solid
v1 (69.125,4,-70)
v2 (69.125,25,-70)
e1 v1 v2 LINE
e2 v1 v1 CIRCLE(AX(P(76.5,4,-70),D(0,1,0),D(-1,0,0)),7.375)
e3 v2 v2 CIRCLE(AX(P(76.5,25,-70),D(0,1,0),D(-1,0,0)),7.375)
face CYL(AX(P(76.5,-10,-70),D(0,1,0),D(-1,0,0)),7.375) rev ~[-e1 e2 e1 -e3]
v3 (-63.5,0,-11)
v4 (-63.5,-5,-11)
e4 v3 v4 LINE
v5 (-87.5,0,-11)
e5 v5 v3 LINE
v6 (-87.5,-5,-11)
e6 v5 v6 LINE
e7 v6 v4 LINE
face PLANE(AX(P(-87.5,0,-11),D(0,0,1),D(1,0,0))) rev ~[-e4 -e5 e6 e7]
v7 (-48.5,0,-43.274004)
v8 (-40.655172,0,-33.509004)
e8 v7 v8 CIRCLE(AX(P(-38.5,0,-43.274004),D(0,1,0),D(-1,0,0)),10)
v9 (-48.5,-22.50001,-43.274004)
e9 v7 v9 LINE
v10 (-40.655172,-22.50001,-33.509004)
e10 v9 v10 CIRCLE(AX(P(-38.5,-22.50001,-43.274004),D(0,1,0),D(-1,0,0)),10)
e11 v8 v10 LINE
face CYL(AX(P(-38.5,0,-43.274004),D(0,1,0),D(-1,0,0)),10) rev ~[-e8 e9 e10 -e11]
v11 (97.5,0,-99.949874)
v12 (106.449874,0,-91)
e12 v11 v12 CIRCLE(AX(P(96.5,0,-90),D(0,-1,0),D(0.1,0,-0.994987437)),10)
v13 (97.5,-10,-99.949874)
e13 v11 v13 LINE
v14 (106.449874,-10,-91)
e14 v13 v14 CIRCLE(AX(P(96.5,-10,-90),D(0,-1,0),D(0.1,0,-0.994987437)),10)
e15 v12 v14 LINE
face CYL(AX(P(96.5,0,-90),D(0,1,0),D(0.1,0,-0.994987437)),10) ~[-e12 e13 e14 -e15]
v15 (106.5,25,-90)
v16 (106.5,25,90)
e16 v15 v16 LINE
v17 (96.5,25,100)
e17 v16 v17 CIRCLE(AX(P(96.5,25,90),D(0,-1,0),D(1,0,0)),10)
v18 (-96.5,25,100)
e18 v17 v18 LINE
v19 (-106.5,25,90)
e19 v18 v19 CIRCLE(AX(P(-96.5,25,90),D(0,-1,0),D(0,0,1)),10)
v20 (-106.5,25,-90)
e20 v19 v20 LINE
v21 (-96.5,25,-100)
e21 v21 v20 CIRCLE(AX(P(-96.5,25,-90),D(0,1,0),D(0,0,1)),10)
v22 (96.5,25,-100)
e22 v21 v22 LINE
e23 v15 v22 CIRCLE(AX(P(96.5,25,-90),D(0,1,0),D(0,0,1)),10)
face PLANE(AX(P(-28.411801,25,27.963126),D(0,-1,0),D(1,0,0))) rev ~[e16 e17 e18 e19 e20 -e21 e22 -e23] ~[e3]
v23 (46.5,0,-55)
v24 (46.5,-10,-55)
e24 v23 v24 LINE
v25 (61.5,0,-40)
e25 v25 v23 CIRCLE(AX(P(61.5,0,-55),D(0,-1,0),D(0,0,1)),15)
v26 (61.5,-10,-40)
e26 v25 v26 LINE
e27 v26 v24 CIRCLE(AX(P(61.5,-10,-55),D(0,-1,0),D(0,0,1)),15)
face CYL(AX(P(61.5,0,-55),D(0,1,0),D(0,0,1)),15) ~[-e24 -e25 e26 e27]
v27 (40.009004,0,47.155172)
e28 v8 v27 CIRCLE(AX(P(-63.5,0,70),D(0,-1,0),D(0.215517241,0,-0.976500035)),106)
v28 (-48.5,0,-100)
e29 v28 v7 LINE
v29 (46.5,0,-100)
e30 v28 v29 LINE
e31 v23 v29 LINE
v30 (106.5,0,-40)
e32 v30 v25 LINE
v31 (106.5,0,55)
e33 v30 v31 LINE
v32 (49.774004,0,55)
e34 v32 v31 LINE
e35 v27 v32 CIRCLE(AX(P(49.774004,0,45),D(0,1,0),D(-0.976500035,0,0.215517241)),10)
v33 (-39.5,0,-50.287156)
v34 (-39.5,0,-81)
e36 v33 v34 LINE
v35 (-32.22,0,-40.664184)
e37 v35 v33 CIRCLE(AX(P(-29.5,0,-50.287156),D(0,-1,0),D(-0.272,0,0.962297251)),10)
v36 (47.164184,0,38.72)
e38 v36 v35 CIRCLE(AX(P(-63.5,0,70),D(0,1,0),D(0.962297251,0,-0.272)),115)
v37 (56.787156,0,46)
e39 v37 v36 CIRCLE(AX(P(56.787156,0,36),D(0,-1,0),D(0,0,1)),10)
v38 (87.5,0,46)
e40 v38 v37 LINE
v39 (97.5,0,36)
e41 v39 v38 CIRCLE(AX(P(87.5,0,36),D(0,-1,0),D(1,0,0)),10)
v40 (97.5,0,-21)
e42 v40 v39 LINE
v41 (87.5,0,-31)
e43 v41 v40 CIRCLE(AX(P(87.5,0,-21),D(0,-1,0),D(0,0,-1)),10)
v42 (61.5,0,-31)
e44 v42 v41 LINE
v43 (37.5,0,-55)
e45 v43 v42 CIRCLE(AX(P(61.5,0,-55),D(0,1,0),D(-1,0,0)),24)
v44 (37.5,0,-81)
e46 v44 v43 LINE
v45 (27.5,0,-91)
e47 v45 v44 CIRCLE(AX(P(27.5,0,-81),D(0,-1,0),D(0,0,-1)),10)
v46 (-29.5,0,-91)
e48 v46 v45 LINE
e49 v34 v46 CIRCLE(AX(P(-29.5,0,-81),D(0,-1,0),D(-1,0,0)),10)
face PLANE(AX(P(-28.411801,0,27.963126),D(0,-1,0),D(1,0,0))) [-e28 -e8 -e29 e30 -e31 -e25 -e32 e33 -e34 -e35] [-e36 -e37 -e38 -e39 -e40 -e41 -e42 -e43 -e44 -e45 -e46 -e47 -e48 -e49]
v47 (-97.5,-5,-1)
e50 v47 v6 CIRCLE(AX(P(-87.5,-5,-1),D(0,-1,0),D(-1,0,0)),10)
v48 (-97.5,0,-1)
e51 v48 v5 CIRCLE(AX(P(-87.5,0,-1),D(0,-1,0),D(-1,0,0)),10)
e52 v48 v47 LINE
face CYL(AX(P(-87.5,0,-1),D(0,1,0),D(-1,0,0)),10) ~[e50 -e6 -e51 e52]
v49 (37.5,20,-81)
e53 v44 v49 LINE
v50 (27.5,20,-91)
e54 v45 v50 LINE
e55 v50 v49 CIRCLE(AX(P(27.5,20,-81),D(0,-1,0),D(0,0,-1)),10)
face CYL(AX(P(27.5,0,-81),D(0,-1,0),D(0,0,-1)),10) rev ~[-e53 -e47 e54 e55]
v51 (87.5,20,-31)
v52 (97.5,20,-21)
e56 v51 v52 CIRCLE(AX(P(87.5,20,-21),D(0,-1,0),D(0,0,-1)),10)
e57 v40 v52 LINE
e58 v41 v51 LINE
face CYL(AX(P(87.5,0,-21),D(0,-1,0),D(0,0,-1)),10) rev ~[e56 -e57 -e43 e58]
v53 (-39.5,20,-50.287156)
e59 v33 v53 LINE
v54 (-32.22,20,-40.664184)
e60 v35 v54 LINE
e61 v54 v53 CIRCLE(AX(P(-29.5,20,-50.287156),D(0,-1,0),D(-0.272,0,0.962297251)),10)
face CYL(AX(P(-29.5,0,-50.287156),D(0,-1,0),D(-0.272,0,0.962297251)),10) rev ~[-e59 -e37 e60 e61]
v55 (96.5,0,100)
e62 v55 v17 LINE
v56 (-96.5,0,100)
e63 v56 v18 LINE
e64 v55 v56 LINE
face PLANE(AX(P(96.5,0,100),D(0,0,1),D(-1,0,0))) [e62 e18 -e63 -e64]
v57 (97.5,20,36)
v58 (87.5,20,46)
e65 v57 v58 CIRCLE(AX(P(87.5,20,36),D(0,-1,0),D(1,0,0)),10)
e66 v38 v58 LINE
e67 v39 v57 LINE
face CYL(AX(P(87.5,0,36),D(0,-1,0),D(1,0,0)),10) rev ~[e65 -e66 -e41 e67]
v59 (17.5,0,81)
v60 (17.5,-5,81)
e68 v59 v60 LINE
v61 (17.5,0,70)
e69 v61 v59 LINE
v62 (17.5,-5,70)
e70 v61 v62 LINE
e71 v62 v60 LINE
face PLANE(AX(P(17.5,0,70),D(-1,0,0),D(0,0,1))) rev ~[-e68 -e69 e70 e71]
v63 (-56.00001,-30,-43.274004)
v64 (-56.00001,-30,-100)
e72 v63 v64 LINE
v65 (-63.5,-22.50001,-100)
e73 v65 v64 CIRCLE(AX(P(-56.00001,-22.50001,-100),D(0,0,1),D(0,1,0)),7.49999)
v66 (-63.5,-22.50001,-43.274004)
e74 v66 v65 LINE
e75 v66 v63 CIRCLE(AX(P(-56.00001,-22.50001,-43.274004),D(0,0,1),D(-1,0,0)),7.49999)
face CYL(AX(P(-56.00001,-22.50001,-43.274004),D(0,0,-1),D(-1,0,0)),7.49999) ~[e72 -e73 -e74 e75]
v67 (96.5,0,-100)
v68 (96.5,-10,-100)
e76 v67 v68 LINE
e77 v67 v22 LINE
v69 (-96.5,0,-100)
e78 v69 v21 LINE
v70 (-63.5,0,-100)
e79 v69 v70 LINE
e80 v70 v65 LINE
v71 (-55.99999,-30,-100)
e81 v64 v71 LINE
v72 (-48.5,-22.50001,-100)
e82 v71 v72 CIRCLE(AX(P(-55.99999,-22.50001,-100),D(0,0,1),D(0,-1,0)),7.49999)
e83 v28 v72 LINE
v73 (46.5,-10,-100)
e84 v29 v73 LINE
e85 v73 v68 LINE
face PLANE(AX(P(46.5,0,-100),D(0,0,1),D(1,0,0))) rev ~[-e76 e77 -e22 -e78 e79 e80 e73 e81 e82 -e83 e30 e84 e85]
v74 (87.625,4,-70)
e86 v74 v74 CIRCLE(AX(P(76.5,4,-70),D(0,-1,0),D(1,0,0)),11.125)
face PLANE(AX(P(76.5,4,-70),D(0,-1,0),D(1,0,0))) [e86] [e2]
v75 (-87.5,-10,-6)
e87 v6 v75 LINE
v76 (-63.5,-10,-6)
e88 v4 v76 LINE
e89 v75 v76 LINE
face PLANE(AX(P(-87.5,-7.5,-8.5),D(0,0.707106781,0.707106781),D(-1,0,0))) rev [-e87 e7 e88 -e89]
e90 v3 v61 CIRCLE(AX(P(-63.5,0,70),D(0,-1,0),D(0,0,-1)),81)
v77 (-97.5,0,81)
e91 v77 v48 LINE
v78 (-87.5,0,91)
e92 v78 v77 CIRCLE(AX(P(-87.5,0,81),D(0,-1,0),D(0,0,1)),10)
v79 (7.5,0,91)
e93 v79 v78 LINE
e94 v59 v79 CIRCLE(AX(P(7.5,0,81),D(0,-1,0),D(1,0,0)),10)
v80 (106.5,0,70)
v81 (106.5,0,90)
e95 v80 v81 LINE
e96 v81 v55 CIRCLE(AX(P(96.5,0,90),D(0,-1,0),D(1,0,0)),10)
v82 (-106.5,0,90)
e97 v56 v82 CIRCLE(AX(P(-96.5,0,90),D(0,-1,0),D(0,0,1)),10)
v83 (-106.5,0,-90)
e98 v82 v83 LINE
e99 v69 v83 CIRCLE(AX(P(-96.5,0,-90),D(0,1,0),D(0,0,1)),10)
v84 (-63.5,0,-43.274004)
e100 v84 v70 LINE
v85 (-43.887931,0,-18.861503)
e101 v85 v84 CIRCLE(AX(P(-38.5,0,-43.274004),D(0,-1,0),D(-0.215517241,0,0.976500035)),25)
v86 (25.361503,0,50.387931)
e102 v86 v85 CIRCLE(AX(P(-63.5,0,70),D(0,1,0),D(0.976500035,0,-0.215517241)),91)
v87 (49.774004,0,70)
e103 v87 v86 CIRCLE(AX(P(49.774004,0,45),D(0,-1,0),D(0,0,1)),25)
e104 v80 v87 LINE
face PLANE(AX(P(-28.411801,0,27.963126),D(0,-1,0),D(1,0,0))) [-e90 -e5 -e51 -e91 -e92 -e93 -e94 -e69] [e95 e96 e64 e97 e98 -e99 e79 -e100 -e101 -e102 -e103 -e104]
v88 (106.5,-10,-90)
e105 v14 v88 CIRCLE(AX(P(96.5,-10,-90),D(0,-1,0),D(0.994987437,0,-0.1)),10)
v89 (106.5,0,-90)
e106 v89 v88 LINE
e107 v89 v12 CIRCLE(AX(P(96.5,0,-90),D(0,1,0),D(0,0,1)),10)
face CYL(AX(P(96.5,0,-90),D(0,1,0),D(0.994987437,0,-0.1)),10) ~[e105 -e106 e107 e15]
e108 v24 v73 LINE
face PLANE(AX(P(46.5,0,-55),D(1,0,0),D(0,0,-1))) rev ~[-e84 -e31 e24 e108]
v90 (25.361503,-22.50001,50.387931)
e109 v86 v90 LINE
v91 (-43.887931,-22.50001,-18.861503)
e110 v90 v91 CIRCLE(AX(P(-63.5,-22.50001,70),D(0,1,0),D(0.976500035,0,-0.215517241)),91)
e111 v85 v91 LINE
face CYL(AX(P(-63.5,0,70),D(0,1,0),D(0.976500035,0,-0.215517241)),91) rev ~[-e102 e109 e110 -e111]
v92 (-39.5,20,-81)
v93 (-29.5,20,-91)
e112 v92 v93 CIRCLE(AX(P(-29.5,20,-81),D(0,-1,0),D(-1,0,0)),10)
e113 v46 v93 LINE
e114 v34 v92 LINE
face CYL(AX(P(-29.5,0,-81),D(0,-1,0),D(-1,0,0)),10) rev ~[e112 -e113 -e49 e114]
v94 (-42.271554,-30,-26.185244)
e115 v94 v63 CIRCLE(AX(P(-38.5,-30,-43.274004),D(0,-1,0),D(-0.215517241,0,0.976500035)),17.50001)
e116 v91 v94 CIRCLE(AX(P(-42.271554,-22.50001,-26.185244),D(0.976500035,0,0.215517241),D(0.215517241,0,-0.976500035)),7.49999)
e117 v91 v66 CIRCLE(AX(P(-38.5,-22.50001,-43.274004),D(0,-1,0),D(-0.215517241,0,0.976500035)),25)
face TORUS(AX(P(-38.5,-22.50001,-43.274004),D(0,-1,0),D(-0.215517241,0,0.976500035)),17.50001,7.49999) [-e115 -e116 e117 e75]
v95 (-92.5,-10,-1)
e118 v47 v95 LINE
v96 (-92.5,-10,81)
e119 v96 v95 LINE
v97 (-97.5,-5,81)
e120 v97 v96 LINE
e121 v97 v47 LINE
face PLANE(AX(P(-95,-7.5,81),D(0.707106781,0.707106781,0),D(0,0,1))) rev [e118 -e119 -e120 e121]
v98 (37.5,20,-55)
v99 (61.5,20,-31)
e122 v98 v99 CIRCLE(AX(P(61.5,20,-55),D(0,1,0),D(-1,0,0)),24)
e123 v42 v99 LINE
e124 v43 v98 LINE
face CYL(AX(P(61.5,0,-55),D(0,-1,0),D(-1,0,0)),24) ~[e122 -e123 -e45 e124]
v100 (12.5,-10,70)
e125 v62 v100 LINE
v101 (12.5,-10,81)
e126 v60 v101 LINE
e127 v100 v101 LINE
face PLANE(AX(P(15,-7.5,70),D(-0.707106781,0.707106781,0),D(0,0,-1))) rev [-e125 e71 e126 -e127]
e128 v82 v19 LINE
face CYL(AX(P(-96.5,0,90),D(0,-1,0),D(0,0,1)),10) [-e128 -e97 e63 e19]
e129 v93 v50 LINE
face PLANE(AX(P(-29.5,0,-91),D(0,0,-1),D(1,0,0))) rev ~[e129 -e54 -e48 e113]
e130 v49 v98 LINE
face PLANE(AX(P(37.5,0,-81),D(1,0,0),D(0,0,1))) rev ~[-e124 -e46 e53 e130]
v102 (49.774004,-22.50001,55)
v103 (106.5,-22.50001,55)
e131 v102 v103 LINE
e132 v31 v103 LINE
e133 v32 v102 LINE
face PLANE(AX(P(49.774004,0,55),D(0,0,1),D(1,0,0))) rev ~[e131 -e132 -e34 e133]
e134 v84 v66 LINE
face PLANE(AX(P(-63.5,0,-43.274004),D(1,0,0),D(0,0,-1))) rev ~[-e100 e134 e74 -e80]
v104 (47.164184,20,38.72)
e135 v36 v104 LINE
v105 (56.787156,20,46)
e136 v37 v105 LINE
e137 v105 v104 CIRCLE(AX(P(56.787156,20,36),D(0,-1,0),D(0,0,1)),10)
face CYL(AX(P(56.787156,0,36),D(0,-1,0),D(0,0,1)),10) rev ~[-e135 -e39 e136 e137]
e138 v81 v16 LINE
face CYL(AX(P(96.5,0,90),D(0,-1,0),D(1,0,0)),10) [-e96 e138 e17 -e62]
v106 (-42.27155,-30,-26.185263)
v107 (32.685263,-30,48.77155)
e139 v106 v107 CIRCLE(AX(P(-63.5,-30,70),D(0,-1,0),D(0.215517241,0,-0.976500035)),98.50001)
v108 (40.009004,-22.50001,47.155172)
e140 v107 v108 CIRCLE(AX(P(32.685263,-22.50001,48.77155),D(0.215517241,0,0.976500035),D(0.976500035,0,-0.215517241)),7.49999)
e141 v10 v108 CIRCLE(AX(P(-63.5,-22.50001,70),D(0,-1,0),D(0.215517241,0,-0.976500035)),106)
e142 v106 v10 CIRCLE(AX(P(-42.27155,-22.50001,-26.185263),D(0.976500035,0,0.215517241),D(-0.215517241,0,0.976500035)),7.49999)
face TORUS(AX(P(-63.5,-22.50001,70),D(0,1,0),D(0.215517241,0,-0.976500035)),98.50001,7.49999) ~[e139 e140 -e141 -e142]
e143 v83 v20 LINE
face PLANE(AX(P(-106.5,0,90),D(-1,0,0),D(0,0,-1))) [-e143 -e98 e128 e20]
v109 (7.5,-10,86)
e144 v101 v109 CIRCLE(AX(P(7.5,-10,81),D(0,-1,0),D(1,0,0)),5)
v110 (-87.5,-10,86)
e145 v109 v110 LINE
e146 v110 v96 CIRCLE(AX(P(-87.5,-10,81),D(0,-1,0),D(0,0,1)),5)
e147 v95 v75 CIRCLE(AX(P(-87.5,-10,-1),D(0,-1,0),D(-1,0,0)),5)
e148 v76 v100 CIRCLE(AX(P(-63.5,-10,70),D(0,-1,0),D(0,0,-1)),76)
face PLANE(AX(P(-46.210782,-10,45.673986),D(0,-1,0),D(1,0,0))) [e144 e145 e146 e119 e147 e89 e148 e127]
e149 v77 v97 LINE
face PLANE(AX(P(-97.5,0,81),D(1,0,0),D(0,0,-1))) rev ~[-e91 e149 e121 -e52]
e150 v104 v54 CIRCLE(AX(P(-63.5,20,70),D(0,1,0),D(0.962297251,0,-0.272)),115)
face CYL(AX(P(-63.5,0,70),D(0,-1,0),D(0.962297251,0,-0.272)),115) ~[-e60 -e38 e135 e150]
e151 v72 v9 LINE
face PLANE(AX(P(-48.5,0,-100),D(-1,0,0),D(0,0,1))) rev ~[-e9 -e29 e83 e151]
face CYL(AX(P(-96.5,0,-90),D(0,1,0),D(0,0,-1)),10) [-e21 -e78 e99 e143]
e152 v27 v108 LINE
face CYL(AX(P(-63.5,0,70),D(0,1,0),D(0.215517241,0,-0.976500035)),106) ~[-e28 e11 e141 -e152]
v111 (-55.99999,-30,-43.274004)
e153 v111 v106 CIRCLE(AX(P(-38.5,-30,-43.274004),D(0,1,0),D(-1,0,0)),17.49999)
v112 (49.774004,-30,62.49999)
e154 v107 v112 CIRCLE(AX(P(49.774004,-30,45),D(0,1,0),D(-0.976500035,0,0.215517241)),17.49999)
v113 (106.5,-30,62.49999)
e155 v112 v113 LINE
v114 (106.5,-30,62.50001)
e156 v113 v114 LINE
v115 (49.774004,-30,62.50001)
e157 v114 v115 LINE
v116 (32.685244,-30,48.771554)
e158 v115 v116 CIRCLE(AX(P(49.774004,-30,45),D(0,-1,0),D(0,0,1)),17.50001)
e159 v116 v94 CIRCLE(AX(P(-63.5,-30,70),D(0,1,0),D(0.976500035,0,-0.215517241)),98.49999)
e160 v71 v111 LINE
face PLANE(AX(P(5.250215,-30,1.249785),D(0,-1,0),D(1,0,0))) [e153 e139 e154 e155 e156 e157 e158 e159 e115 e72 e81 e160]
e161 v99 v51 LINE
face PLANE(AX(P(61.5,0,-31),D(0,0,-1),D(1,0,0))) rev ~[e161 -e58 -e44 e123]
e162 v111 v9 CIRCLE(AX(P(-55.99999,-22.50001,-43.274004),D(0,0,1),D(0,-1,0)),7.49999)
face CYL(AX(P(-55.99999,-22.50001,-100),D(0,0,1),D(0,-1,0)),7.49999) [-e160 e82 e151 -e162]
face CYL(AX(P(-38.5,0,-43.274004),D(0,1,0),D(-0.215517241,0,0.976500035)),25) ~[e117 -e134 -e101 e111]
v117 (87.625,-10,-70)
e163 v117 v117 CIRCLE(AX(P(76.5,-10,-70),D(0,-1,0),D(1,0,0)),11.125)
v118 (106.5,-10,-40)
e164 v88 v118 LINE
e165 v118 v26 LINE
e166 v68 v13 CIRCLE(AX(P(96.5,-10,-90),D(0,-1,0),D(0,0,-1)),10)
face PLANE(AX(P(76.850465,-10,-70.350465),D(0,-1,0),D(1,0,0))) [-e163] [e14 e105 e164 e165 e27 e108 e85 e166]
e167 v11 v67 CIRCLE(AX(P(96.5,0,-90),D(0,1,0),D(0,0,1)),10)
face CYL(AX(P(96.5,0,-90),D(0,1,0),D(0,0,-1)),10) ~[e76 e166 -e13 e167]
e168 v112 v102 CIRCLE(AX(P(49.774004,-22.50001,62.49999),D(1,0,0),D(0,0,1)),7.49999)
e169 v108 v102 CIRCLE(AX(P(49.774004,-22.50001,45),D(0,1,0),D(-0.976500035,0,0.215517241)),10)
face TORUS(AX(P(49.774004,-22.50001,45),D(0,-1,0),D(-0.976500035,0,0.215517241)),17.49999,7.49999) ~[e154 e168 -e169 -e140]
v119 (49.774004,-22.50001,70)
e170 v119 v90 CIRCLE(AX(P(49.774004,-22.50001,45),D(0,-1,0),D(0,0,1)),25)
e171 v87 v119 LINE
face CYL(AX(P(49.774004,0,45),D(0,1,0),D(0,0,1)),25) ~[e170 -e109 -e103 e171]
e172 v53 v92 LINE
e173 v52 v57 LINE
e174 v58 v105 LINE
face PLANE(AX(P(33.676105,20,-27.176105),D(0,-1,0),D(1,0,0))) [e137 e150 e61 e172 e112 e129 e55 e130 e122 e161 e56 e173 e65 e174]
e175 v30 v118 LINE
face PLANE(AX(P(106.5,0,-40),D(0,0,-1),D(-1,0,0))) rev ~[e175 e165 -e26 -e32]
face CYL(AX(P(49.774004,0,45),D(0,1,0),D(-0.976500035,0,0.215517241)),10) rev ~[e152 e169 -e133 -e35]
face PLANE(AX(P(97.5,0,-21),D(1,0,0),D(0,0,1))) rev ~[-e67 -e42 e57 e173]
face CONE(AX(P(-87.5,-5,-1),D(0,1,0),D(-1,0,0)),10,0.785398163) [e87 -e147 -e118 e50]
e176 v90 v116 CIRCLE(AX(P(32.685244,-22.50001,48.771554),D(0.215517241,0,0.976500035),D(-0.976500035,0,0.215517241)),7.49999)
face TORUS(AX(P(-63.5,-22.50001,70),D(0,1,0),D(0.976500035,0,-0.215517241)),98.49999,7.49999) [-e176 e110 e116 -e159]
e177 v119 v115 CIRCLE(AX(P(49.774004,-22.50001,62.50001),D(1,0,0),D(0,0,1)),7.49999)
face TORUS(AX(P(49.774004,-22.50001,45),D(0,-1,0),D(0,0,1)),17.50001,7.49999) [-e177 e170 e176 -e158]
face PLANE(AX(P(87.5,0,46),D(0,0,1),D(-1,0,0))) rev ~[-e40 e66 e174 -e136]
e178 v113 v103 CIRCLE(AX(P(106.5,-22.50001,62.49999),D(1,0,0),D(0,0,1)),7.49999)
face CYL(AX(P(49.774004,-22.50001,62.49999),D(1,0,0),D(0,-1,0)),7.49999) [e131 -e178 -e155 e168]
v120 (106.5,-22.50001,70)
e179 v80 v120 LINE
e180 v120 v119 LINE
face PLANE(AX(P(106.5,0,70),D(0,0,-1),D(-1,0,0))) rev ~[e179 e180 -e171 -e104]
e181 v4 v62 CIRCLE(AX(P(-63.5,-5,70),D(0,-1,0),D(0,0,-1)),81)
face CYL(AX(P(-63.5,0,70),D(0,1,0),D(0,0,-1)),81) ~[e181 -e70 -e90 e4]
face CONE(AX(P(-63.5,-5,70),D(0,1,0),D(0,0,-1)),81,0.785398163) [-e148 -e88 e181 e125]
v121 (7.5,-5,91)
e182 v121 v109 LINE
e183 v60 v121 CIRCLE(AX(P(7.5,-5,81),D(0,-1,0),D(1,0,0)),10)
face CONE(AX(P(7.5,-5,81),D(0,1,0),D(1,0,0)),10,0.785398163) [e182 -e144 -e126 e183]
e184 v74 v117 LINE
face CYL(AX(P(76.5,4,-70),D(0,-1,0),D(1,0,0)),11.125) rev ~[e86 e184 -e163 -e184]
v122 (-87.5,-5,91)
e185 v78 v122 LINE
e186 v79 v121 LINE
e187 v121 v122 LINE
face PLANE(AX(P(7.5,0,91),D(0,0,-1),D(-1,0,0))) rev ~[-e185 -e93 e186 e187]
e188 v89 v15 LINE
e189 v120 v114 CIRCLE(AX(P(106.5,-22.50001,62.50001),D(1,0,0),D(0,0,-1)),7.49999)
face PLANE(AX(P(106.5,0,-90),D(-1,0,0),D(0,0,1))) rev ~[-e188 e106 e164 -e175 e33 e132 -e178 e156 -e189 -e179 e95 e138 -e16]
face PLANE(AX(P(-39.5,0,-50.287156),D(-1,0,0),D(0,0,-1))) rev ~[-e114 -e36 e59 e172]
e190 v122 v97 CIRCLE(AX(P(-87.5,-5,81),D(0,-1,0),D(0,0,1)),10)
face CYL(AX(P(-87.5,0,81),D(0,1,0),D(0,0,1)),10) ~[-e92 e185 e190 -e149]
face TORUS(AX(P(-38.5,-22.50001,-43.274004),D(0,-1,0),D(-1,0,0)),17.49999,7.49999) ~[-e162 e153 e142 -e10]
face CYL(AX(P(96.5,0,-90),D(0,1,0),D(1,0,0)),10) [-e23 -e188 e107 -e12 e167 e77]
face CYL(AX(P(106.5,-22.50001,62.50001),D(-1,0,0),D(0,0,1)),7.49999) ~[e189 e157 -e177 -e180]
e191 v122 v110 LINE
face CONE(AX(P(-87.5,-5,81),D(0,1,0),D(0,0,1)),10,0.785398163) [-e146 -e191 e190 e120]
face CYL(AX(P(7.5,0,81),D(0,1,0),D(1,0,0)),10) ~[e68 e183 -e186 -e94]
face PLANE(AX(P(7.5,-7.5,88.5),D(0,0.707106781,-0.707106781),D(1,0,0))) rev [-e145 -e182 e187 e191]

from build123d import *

# Parameters (mm, degrees)
F1_DEPTH        = 25
F2_DEPTH        = 10
F3_DEPTH        = 20
F4_DEPTH        = 30
F5_R            = 7.49999
F6_SIZE         = 5
F7_R            = 10
F8_DEPTH        = 10
F10_D           = 14.75
F10_CBORE_D     = 22.25
F10_CBORE_DEPTH = 14


# Not quite as in the source:
# - a fillet or chamfer is up to 0.001 mm smaller than in the source, because OpenCascade refuses the exact size


with BuildPart() as f1:
    # F0 (on Front) → F1 (new body)
    with BuildSketch(Plane.XZ):
        with BuildLine():
            Line((96.5, 100), (-96.5, 100))
            ThreePointArc((-96.5, 100), (-103.5710678119, 97.0710678119), (-106.5, 90))
            Line((-106.5, 90), (-106.5, -90))
            ThreePointArc((-106.5, -90), (-103.5710678119, -97.0710678119), (-96.5, -100))
            Line((-96.5, -100), (-63.5, -100))
            Line((-63.5, -100), (-63.5, -43.2740040786))
            ThreePointArc((-63.5, -43.2740040786), (-57.9897187751, -27.6167098657), (-43.8879310345, -18.8615031996))
            ThreePointArc((-43.8879310345, -18.8615031996), (0.846717088, 5.653282912), (25.3615031996, 50.3879310345))
            ThreePointArc((25.3615031996, 50.3879310345), (34.1167098657, 64.4897187751), (49.7740040786, 70))
            Line((49.7740040786, 70), (106.5, 70))
            Line((106.5, 70), (106.5, 90))
            ThreePointArc((106.5, 90), (103.5710678119, 97.0710678119), (96.5, 100))
        make_face()
        with BuildLine():
            ThreePointArc((17.5, 70), (-6.2243507239, 12.7243507239), (-63.5, -11))
            Line((-63.5, -11), (-87.5, -11))
            ThreePointArc((-87.5, -11), (-94.5710678119, -8.0710678119), (-97.5, -1))
            Line((-97.5, -1), (-97.5, 81))
            ThreePointArc((-97.5, 81), (-94.5710678119, 88.0710678119), (-87.5, 91))
            Line((-87.5, 91), (7.5, 91))
            ThreePointArc((7.5, 91), (14.5710678119, 88.0710678119), (17.5, 81))
            Line((17.5, 81), (17.5, 70))
        make_face(mode=Mode.SUBTRACT)
        with BuildLine():
            ThreePointArc((-96.5, -100), (-103.5710678119, -97.0710678119), (-106.5, -90))
            Line((-106.5, -90), (-106.5, -100))
            Line((-106.5, -100), (-96.5, -100))
        make_face()
        with BuildLine():
            Line((106.5, 55), (106.5, 70))
            Line((106.5, 70), (49.7740040786, 70))
            ThreePointArc((49.7740040786, 70), (34.1167098657, 64.4897187751), (25.3615031996, 50.3879310345))
            ThreePointArc((25.3615031996, 50.3879310345), (0.846717088, 5.653282912), (-43.8879310345, -18.8615031996))
            ThreePointArc((-43.8879310345, -18.8615031996), (-57.9897187751, -27.6167098657), (-63.5, -43.2740040786))
            Line((-63.5, -43.2740040786), (-63.5, -100))
            Line((-63.5, -100), (-48.5, -100))
            Line((-48.5, -100), (-48.5, -43.2740040786))
            ThreePointArc((-48.5, -43.2740040786), (-46.29588751, -37.0110863935), (-40.6551724138, -33.509003727))
            ThreePointArc((-40.6551724138, -33.509003727), (11.4533188058, -4.9533188058), (40.009003727, 47.1551724138))
            ThreePointArc((40.009003727, 47.1551724138), (43.5110863935, 52.79588751), (49.7740040786, 55))
            Line((49.7740040786, 55), (106.5, 55))
        make_face()
        with BuildLine():
            Line((106.5, -40), (106.5, 55))
            Line((106.5, 55), (49.7740040786, 55))
            ThreePointArc((49.7740040786, 55), (43.5110863935, 52.79588751), (40.009003727, 47.1551724138))
            ThreePointArc((40.009003727, 47.1551724138), (11.4533188058, -4.9533188058), (-40.6551724138, -33.509003727))
            ThreePointArc((-40.6551724138, -33.509003727), (-46.29588751, -37.0110863935), (-48.5, -43.2740040786))
            Line((-48.5, -43.2740040786), (-48.5, -100))
            Line((-48.5, -100), (46.5, -100))
            Line((46.5, -100), (46.5, -55))
            ThreePointArc((46.5, -55), (50.8933982822, -44.3933982822), (61.5, -40))
            Line((61.5, -40), (106.5, -40))
        make_face()
        with BuildLine():
            Line((56.7871564216, 46), (87.5, 46))
            ThreePointArc((87.5, 46), (94.5710678119, 43.0710678119), (97.5, 36))
            Line((97.5, 36), (97.5, -21))
            ThreePointArc((97.5, -21), (94.5710678119, -28.0710678119), (87.5, -31))
            Line((87.5, -31), (61.5, -31))
            ThreePointArc((61.5, -31), (44.5294372515, -38.0294372515), (37.5, -55))
            Line((37.5, -55), (37.5, -81))
            ThreePointArc((37.5, -81), (34.5710678119, -88.0710678119), (27.5, -91))
            Line((27.5, -91), (-29.5, -91))
            ThreePointArc((-29.5, -91), (-36.5710678119, -88.0710678119), (-39.5, -81))
            Line((-39.5, -81), (-39.5, -50.2871564216))
            ThreePointArc((-39.5, -50.2871564216), (-37.474960815, -44.25391517), (-32.22, -40.6641839079))
            ThreePointArc((-32.22, -40.6641839079), (17.8172798365, -11.3172798365), (47.1641839079, 38.72))
            ThreePointArc((47.1641839079, 38.72), (50.75391517, 43.974960815), (56.7871564216, 46))
        make_face(mode=Mode.SUBTRACT)
        with BuildLine():
            Line((106.5, -90), (106.5, -40))
            Line((106.5, -40), (61.5, -40))
            ThreePointArc((61.5, -40), (50.8933982822, -44.3933982822), (46.5, -55))
            Line((46.5, -55), (46.5, -100))
            Line((46.5, -100), (96.5, -100))
            ThreePointArc((96.5, -100), (97.0006277506, -99.9874607311), (97.5, -99.9498743711))
            ThreePointArc((97.5, -99.9498743711), (103.5710678119, -97.0710678119), (106.4498743711, -91))
            ThreePointArc((106.4498743711, -91), (106.4874607311, -90.5006277506), (106.5, -90))
        make_face()
        with BuildLine():
            Line((106.5, -91), (106.5, -90))
            ThreePointArc((106.5, -90), (106.4874607311, -90.5006277506), (106.4498743711, -91))
            Line((106.4498743711, -91), (106.5, -91))
        make_face()
        with BuildLine():
            Line((106.5, -91), (106.4498743711, -91))
            ThreePointArc((106.4498743711, -91), (103.5710678119, -97.0710678119), (97.5, -99.9498743711))
            Line((97.5, -99.9498743711), (97.5, -100))
            Line((97.5, -100), (106.5, -100))
            Line((106.5, -100), (106.5, -91))
        make_face()
        with BuildLine():
            ThreePointArc((97.5, -99.9498743711), (97.0006277506, -99.9874607311), (96.5, -100))
            Line((96.5, -100), (97.5, -100))
            Line((97.5, -100), (97.5, -99.9498743711))
        make_face()
        with BuildLine():
            Line((-87.5, -11), (-63.5, -11))
            ThreePointArc((-63.5, -11), (-6.2243507239, 12.7243507239), (17.5, 70))
            Line((17.5, 70), (17.5, 81))
            ThreePointArc((17.5, 81), (14.5710678119, 88.0710678119), (7.5, 91))
            Line((7.5, 91), (-87.5, 91))
            ThreePointArc((-87.5, 91), (-94.5710678119, 88.0710678119), (-97.5, 81))
            Line((-97.5, 81), (-97.5, -1))
            ThreePointArc((-97.5, -1), (-94.5710678119, -8.0710678119), (-87.5, -11))
        make_face()
        with BuildLine():
            ThreePointArc((97.5, 36), (94.5710678119, 43.0710678119), (87.5, 46))
            Line((87.5, 46), (56.7871564216, 46))
            ThreePointArc((56.7871564216, 46), (50.75391517, 43.974960815), (47.1641839079, 38.72))
            ThreePointArc((47.1641839079, 38.72), (17.8172798365, -11.3172798365), (-32.22, -40.6641839079))
            ThreePointArc((-32.22, -40.6641839079), (-37.474960815, -44.25391517), (-39.5, -50.2871564216))
            Line((-39.5, -50.2871564216), (-39.5, -81))
            ThreePointArc((-39.5, -81), (-36.5710678119, -88.0710678119), (-29.5, -91))
            Line((-29.5, -91), (27.5, -91))
            ThreePointArc((27.5, -91), (34.5710678119, -88.0710678119), (37.5, -81))
            Line((37.5, -81), (37.5, -55))
            ThreePointArc((37.5, -55), (44.5294372515, -38.0294372515), (61.5, -31))
            Line((61.5, -31), (87.5, -31))
            ThreePointArc((87.5, -31), (94.5710678119, -28.0710678119), (97.5, -21))
            Line((97.5, -21), (97.5, 36))
        make_face()
    extrude(amount=-F1_DEPTH)

    # F0 (on Front) → F2 (join)
    with BuildSketch(Plane.XZ):
        with BuildLine():
            Line((-87.5, -11), (-63.5, -11))
            ThreePointArc((-63.5, -11), (-6.2243507239, 12.7243507239), (17.5, 70))
            Line((17.5, 70), (17.5, 81))
            ThreePointArc((17.5, 81), (14.5710678119, 88.0710678119), (7.5, 91))
            Line((7.5, 91), (-87.5, 91))
            ThreePointArc((-87.5, 91), (-94.5710678119, 88.0710678119), (-97.5, 81))
            Line((-97.5, 81), (-97.5, -1))
            ThreePointArc((-97.5, -1), (-94.5710678119, -8.0710678119), (-87.5, -11))
        make_face()
    extrude(amount=F2_DEPTH)

    # F0 (on Front) → F3 (cut)
    with BuildSketch(Plane.XZ):
        with BuildLine():
            ThreePointArc((97.5, 36), (94.5710678119, 43.0710678119), (87.5, 46))
            Line((87.5, 46), (56.7871564216, 46))
            ThreePointArc((56.7871564216, 46), (50.75391517, 43.974960815), (47.1641839079, 38.72))
            ThreePointArc((47.1641839079, 38.72), (17.8172798365, -11.3172798365), (-32.22, -40.6641839079))
            ThreePointArc((-32.22, -40.6641839079), (-37.474960815, -44.25391517), (-39.5, -50.2871564216))
            Line((-39.5, -50.2871564216), (-39.5, -81))
            ThreePointArc((-39.5, -81), (-36.5710678119, -88.0710678119), (-29.5, -91))
            Line((-29.5, -91), (27.5, -91))
            ThreePointArc((27.5, -91), (34.5710678119, -88.0710678119), (37.5, -81))
            Line((37.5, -81), (37.5, -55))
            ThreePointArc((37.5, -55), (44.5294372515, -38.0294372515), (61.5, -31))
            Line((61.5, -31), (87.5, -31))
            ThreePointArc((87.5, -31), (94.5710678119, -28.0710678119), (97.5, -21))
            Line((97.5, -21), (97.5, 36))
        make_face()
    extrude(amount=-F3_DEPTH, mode=Mode.SUBTRACT)

    # F0 (on Front) → F4 (join)
    with BuildSketch(Plane.XZ):
        with BuildLine():
            Line((106.5, 55), (106.5, 70))
            Line((106.5, 70), (49.7740040786, 70))
            ThreePointArc((49.7740040786, 70), (34.1167098657, 64.4897187751), (25.3615031996, 50.3879310345))
            ThreePointArc((25.3615031996, 50.3879310345), (0.846717088, 5.653282912), (-43.8879310345, -18.8615031996))
            ThreePointArc((-43.8879310345, -18.8615031996), (-57.9897187751, -27.6167098657), (-63.5, -43.2740040786))
            Line((-63.5, -43.2740040786), (-63.5, -100))
            Line((-63.5, -100), (-48.5, -100))
            Line((-48.5, -100), (-48.5, -43.2740040786))
            ThreePointArc((-48.5, -43.2740040786), (-46.29588751, -37.0110863935), (-40.6551724138, -33.509003727))
            ThreePointArc((-40.6551724138, -33.509003727), (11.4533188058, -4.9533188058), (40.009003727, 47.1551724138))
            ThreePointArc((40.009003727, 47.1551724138), (43.5110863935, 52.79588751), (49.7740040786, 55))
            Line((49.7740040786, 55), (106.5, 55))
        make_face()
    extrude(amount=F4_DEPTH)

    # F5 (radius 7.5 in the source; OpenCascade refuses exactly that, so slightly less here)
    f5_edges = [f1.edges().sort_by_distance(p)[0] for p in [
        (-63.5, -30, -71.637002),
        (-48.5, -30, -71.637002),
    ]]
    fillet(f5_edges, radius=F5_R)

    # F6
    f6_edges = [f1.edges().sort_by_distance(p)[0] for p in [
        (-97.5, -10, 40),
    ]]
    chamfer(f6_edges, length=F6_SIZE)

    # F7
    f7_edges = [f1.edges().sort_by_distance(p)[0] for p in [
        (-106.5, 12.5, -100),
        (106.5, 12.5, -100),
    ]]
    fillet(f7_edges, radius=F7_R)

    # F0 (on Front) → F8 (join)
    with BuildSketch(Plane.XZ):
        with BuildLine():
            Line((106.5, -90), (106.5, -40))
            Line((106.5, -40), (61.5, -40))
            ThreePointArc((61.5, -40), (50.8933982822, -44.3933982822), (46.5, -55))
            Line((46.5, -55), (46.5, -100))
            Line((46.5, -100), (96.5, -100))
            ThreePointArc((96.5, -100), (97.0006277506, -99.9874607311), (97.5, -99.9498743711))
            ThreePointArc((97.5, -99.9498743711), (103.5710678119, -97.0710678119), (106.4498743711, -91))
            ThreePointArc((106.4498743711, -91), (106.4874607311, -90.5006277506), (106.5, -90))
        make_face()
    extrude(amount=F8_DEPTH)

    # F10 (through all)
    with Locations(Plane.XZ.offset(10)):
        with Locations((76.5, -70)):
            CounterBoreHole(F10_D / 2, F10_CBORE_D / 2, F10_CBORE_DEPTH)


solid = f1.part
